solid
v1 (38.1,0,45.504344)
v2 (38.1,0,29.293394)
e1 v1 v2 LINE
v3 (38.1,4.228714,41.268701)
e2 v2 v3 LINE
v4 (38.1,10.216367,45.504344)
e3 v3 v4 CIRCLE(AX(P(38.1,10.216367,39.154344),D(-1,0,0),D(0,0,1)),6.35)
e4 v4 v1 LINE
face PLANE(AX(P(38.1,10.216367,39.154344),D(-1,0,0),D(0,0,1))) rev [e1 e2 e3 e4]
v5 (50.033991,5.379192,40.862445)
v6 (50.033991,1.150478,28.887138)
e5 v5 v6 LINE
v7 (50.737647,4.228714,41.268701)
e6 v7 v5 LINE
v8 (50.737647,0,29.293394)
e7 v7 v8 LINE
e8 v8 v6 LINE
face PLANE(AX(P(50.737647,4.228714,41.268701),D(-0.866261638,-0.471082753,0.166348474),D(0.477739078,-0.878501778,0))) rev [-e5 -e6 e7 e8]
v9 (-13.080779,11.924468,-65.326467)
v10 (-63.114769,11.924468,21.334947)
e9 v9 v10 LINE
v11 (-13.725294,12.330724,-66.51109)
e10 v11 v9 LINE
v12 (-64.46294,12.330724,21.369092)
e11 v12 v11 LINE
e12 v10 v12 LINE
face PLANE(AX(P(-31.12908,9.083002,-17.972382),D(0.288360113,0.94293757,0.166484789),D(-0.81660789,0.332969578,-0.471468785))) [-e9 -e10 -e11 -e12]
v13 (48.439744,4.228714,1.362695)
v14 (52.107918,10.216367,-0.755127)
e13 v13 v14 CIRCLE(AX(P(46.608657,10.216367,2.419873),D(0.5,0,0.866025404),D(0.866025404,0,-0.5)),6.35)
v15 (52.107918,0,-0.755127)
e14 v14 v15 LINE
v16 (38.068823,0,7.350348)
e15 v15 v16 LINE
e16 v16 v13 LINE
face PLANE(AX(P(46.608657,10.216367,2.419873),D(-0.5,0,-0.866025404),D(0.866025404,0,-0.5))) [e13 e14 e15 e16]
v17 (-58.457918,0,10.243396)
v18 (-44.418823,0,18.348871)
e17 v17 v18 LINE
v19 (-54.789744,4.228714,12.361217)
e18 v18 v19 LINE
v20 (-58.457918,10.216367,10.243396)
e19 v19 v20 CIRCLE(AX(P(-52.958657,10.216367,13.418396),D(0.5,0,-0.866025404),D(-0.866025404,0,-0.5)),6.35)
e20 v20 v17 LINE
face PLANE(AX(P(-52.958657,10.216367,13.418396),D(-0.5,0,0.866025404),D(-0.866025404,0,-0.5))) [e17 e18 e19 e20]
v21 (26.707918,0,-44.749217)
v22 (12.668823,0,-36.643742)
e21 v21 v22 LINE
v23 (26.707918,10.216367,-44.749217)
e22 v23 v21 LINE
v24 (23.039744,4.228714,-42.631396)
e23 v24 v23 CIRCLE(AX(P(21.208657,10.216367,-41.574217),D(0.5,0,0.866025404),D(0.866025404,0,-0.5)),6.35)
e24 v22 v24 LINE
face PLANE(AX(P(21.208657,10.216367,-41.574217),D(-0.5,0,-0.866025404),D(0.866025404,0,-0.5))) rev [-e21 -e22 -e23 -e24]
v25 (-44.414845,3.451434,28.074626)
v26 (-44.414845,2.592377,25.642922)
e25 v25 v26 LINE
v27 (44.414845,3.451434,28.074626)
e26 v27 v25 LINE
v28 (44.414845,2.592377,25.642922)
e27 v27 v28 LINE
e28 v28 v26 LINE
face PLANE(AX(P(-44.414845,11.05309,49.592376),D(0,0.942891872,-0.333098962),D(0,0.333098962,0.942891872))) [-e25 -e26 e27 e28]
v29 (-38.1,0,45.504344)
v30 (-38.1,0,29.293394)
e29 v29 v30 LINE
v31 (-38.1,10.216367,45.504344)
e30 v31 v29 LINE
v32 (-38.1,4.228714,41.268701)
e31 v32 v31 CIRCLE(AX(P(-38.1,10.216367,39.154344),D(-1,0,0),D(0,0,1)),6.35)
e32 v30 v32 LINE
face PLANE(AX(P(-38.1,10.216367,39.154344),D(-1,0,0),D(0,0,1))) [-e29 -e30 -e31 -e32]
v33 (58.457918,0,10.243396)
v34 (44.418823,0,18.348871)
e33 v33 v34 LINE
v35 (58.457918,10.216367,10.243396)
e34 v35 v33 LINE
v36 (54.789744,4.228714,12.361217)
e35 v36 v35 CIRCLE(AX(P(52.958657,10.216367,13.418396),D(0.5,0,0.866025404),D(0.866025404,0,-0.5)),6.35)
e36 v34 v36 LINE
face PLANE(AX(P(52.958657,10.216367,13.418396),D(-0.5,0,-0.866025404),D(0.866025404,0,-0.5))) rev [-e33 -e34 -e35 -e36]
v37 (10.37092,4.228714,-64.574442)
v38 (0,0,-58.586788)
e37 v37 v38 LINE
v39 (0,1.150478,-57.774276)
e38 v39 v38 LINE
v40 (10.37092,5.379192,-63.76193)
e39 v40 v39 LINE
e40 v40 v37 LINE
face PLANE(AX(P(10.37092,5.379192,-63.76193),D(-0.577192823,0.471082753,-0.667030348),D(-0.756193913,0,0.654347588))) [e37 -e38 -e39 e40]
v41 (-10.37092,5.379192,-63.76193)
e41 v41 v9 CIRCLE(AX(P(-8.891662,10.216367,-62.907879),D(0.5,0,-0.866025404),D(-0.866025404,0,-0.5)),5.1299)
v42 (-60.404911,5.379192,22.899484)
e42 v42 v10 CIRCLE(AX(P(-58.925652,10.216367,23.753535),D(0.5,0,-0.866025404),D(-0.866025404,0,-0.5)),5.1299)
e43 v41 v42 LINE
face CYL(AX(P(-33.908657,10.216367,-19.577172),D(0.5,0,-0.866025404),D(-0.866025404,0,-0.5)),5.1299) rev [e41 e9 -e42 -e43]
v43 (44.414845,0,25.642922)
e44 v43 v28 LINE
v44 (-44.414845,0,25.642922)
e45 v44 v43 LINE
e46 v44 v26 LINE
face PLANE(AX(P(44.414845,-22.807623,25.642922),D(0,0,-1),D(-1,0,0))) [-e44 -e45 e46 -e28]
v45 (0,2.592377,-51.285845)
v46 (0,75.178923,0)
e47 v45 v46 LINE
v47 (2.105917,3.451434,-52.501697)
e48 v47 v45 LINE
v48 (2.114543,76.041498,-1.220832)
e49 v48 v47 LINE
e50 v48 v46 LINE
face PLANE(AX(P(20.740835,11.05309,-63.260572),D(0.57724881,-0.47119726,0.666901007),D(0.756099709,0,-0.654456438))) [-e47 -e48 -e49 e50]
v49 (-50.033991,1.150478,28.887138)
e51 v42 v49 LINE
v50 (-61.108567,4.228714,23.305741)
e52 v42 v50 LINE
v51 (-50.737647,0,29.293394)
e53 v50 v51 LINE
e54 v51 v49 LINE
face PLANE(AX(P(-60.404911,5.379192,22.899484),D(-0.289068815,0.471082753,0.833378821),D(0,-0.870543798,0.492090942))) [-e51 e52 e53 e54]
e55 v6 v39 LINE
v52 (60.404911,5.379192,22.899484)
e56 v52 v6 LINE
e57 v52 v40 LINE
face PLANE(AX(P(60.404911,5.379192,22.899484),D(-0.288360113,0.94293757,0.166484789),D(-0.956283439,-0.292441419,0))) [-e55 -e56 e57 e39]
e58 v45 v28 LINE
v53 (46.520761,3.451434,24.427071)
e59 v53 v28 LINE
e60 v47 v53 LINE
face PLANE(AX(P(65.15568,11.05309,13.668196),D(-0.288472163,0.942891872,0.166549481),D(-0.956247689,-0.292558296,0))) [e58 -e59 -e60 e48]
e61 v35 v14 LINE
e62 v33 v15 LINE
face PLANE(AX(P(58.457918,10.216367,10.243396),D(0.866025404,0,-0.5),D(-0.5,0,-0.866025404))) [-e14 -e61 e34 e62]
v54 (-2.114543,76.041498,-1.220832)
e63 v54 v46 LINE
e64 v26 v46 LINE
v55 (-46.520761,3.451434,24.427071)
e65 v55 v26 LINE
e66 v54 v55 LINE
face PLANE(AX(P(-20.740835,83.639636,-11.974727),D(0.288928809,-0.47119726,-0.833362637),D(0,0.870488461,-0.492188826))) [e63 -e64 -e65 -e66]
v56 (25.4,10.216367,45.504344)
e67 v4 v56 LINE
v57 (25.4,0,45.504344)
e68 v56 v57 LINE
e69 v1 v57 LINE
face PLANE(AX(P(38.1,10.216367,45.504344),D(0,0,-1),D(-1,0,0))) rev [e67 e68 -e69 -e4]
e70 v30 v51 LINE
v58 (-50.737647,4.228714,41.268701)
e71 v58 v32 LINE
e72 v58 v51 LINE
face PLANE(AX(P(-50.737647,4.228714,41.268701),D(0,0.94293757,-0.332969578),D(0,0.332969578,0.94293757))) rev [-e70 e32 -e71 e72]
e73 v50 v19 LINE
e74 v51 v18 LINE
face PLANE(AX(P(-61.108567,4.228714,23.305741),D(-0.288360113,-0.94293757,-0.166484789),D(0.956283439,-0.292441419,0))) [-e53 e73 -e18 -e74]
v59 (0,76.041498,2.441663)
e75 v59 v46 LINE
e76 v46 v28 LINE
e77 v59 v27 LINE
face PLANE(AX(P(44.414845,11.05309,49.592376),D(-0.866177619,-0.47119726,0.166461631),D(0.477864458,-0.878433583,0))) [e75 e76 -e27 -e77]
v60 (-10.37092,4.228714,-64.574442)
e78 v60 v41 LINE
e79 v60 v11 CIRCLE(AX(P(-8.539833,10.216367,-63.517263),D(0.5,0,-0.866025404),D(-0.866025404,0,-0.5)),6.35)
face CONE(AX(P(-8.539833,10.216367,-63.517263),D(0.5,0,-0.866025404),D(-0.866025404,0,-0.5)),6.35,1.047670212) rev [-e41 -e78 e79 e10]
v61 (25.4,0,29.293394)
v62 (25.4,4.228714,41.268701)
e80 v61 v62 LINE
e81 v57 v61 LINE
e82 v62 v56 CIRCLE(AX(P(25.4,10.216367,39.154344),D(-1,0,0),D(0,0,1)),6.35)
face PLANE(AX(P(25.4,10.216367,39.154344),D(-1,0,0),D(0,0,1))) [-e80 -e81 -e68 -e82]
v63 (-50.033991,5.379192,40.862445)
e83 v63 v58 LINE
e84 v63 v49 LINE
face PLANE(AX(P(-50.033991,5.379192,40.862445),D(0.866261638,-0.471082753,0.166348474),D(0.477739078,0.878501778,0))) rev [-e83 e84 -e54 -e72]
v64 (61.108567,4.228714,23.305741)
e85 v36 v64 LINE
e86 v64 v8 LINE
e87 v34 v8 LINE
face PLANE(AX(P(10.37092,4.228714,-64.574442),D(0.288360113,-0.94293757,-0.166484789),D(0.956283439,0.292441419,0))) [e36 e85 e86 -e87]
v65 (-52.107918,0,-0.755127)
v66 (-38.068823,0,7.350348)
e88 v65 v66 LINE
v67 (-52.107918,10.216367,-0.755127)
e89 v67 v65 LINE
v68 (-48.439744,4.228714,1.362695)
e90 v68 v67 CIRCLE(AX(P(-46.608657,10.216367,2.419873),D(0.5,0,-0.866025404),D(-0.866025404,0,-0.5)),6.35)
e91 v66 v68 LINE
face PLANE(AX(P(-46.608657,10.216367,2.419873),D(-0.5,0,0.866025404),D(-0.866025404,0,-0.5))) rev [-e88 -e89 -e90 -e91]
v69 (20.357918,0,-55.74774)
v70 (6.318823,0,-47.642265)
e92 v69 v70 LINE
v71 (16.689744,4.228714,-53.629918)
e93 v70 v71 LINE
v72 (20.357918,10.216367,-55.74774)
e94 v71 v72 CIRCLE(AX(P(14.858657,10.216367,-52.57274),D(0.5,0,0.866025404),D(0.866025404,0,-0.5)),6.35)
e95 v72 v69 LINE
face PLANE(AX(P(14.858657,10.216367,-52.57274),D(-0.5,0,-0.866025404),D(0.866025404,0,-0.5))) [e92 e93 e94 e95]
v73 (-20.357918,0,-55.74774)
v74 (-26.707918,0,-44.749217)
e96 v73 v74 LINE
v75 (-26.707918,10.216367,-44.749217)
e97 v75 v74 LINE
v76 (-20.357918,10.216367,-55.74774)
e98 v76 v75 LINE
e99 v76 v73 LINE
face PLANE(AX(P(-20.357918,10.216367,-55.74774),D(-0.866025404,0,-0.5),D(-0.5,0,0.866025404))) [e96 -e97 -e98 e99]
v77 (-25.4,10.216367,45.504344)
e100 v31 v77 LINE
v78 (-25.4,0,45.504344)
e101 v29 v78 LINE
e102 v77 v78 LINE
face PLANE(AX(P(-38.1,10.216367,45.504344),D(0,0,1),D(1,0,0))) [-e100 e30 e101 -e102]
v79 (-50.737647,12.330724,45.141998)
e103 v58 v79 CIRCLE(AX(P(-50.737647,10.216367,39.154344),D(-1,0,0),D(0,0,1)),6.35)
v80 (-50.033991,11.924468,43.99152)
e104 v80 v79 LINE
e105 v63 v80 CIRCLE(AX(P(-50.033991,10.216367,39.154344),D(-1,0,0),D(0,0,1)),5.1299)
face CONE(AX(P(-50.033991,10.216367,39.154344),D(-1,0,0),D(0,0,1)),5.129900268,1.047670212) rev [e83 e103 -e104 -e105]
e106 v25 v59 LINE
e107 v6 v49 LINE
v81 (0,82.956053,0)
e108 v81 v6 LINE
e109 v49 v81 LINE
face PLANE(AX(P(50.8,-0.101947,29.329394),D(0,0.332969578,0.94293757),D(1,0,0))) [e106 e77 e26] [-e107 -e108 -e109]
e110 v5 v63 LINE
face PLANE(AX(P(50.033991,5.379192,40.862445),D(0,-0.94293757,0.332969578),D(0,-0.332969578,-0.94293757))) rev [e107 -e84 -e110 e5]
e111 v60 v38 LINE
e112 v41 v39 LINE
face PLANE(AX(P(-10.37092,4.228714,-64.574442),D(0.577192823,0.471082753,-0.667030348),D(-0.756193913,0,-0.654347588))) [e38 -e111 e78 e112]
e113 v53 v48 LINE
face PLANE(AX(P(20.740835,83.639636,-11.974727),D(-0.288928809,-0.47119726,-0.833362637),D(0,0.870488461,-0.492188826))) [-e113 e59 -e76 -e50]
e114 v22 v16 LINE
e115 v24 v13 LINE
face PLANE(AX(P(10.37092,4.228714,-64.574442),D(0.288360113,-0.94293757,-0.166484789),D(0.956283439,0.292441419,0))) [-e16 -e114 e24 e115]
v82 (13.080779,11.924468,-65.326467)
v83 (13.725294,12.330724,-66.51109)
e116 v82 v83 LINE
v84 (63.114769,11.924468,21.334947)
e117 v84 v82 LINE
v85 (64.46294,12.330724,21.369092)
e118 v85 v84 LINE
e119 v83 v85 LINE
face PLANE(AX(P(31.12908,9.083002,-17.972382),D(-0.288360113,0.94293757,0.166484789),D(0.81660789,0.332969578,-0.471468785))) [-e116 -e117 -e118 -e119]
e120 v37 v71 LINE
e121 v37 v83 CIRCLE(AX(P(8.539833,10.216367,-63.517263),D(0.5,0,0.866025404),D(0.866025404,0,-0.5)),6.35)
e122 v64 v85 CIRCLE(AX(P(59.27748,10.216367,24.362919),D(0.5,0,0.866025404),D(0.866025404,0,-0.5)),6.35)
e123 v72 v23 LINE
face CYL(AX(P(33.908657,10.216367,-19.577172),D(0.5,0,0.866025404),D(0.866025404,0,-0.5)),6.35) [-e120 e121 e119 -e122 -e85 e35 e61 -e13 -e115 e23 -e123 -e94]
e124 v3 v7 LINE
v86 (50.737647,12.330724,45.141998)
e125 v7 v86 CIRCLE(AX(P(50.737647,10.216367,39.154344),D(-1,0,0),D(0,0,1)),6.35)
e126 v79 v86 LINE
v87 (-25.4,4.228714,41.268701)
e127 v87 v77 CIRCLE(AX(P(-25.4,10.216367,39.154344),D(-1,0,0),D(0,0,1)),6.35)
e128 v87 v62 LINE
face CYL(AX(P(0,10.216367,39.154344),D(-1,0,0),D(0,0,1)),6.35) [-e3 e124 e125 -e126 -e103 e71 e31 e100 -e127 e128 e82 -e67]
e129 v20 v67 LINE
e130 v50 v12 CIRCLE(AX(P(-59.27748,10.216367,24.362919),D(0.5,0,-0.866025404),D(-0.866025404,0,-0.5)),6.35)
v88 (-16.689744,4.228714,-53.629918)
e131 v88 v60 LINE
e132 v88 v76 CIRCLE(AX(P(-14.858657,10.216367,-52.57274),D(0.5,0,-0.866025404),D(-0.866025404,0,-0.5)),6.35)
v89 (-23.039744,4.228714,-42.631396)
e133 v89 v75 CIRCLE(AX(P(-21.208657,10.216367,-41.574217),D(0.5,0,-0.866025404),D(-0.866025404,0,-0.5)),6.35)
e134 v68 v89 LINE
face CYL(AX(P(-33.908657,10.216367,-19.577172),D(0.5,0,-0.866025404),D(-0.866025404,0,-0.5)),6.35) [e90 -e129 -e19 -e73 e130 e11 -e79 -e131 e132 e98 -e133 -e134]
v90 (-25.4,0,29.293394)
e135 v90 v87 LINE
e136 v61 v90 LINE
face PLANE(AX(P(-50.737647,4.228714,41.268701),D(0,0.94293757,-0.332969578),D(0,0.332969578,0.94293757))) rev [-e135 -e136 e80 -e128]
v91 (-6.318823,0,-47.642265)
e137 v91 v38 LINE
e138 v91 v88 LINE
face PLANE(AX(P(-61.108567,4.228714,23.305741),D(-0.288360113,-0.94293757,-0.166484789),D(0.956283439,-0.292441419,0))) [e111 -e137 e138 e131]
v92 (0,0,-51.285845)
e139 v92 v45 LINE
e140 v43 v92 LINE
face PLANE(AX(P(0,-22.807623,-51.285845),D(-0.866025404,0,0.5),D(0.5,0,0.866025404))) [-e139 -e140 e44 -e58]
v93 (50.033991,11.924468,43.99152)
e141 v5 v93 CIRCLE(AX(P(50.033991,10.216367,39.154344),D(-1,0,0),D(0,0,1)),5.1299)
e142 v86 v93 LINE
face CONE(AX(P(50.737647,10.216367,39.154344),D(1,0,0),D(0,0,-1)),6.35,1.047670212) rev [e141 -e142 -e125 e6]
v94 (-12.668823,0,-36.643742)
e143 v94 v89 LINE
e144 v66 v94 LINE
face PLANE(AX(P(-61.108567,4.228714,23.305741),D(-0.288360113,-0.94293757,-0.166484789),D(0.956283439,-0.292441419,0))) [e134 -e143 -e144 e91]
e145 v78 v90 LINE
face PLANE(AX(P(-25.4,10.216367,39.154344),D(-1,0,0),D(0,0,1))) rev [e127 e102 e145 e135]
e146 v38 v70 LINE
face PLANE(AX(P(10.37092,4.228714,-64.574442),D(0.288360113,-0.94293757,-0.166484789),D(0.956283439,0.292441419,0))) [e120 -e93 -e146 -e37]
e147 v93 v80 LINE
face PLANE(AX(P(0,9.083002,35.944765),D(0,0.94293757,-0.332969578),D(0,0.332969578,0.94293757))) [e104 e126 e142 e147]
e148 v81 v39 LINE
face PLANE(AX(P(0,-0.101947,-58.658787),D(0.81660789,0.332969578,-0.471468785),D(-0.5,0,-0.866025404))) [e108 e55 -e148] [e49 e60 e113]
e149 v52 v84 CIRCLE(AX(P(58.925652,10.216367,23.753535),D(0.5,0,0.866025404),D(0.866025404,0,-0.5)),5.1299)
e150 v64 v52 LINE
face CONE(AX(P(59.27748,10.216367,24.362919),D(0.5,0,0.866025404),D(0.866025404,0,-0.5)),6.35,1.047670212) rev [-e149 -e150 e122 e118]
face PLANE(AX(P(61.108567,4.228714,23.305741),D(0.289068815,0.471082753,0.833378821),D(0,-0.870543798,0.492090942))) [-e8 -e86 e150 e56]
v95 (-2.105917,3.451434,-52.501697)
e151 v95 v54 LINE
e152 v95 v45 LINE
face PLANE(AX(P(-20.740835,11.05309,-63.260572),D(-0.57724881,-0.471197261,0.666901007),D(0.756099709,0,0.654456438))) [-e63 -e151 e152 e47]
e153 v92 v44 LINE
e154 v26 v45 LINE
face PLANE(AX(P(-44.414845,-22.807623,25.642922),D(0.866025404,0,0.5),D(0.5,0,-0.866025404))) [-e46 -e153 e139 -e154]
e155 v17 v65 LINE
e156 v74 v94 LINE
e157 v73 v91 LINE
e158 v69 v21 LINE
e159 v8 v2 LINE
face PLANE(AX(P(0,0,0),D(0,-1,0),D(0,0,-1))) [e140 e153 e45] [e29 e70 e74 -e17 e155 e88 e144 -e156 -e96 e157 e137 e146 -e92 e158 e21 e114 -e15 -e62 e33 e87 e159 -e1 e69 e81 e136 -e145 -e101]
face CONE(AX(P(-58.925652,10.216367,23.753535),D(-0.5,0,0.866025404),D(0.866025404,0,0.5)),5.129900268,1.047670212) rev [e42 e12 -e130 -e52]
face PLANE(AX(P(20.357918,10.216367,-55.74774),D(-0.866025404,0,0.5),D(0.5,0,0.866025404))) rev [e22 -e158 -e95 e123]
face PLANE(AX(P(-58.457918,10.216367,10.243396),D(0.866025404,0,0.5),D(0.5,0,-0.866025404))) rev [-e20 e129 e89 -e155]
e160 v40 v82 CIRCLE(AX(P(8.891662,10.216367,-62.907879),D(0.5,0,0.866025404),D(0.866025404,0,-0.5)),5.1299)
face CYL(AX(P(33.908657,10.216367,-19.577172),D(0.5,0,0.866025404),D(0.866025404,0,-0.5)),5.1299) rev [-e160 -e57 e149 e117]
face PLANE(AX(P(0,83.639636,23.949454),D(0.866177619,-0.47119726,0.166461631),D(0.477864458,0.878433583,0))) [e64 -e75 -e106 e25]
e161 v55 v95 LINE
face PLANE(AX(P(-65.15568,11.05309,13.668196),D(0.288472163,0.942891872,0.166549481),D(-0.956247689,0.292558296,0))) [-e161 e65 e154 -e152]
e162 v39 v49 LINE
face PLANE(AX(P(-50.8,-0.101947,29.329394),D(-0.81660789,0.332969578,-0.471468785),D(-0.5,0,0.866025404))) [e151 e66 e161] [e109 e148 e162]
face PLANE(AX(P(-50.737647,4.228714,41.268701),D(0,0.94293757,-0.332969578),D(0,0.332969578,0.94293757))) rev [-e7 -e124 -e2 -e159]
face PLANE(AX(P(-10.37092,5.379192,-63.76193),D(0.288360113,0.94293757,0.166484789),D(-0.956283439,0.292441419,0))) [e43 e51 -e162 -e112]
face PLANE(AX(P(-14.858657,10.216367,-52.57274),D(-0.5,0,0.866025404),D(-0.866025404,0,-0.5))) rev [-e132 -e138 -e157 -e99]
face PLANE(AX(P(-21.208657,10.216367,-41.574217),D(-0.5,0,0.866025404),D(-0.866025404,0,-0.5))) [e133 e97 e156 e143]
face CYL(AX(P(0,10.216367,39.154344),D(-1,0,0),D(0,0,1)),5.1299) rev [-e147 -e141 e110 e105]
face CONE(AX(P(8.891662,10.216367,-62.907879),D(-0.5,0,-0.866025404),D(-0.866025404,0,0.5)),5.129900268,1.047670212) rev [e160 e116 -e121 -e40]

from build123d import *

# Parameters (mm, degrees)
BOSS_EXTRUDE1_DEPTH  = 82.956052622
CHAMFER1_SIZE        = 83.058
CHAMFER1_SIZE_2      = 29.329393675
BOSS_EXTRUDE3_START  = 2.592376644
BOSS_EXTRUDE3_DEPTH  = 72.586546044
CHAMFER6_SIZE        = 72.644
CHAMFER6_SIZE_2      = 25.663219438
BOSS_EXTRUDE19_DEPTH = 25.4
BOSS_EXTRUDE20_DEPTH = 25.4
BOSS_EXTRUDE21_DEPTH = 25.4
BOSS_EXTRUDE23_DEPTH = 25.4
BOSS_EXTRUDE26_START = 38.1
BOSS_EXTRUDE26_DEPTH = 12.7
BOSS_EXTRUDE27_START = -25.4
BOSS_EXTRUDE27_DEPTH = 12.7
MIRROR2_START        = 38.1
MIRROR2_COPY_2_DEPTH = 12.7
MIRROR2_START_2      = -25.4
MIRROR2_COPY_3_DEPTH = 12.7
MIRROR2_COPY_5_DEPTH = 12.7
MIRROR2_COPY_6_DEPTH = 12.7


with BuildPart() as part:
    # Sketch1 → Boss-Extrude1 (new body)
    with BuildSketch(Plane(origin=(0, 0, 0), x_dir=(1, 0, 0), z_dir=(0, 1, 0))):
        Polygon((-50.8, -29.329393675), (0, 58.65878735), (50.8, -29.329393675), align=None)
    extrude(amount=BOSS_EXTRUDE1_DEPTH)

    # Chamfer1
    # the kernel refuses this chamfer: 83.058, 29.329393675 mm, written as the material it takes off along each edge
    with BuildSketch(Plane(origin=(-158.547298904, 82.956052622, 215.953189756), x_dir=(-0.011114252752895883, -0.9999176455327007, -0.006416816818725978), z_dir=(0.5000000000000001, 0, -0.8660254037844387)), Plane(origin=(266.294597809, 82.956052622, 29.329393675), x_dir=(0, -0.9999176455327007, 0.012833633637452178), z_dir=(-1, 0, 0)), Plane(origin=(-107.747298904, 82.956052622, -245.28258343), x_dir=(0.011114252752896008, -0.9999176455327007, -0.006416816818726048), z_dir=(0.49999999999999994, 0, 0.8660254037844387))) as chamfer1_piece_1:
        Polygon((CHAMFER1_SIZE * 0.999917645533, -CHAMFER1_SIZE * 0.0128336336375), (-CHAMFER1_SIZE_2 * 0.0128336336374, -CHAMFER1_SIZE_2 * 0.999917645527), (0, 0), align=None)
    extrude(amount=532.589195618, mode=Mode.SUBTRACT)


with BuildPart() as body_2:
    # Sketch2 → Boss-Extrude3 (new body)
    with BuildSketch(Plane(origin=(0, 0, 0), x_dir=(1, 0, 0), z_dir=(0, 1, 0)).offset(BOSS_EXTRUDE3_START)):
        Polygon((-44.45, -25.663219465), (0, 51.326438931), (44.45, -25.663219465), align=None)
    extrude(amount=BOSS_EXTRUDE3_DEPTH)

    # Chamfer6
    # the kernel refuses this chamfer: 72.644, 25.663219438 mm, written as the material it takes off along each edge
    with BuildSketch(Plane(origin=(-94.237538797, 75.178922689, -214.550644108), x_dir=(0.011118590367512081, -0.9999175812357334, -0.0064193211416922824), z_dir=(0.5000000000000001, 0, 0.8660254037844386)), Plane(origin=(-138.687538797, 75.178922689, 188.887424643), x_dir=(-0.011118590367511921, -0.9999175812357334, -0.006419321141692186), z_dir=(0.49999999999999994, 0, -0.8660254037844387)), Plane(origin=(232.925077595, 75.178922689, 25.663219465), x_dir=(0, -0.9999175812357332, 0.012838642283384548), z_dir=(-1, 0, 0))) as chamfer6_piece_1:
        Polygon((CHAMFER6_SIZE * 0.999917581236, -CHAMFER6_SIZE * 0.0128386422834), (-CHAMFER6_SIZE_2 * 0.0128386422834, -CHAMFER6_SIZE_2 * 0.999917581236), (0, 0), align=None)
    extrude(amount=465.850155189, mode=Mode.SUBTRACT)

    # Sketch19 → Boss-Extrude19 (add)
    with BuildSketch(Plane(origin=(0, 8.341471254, 23.611918188), x_dir=(1, 0, 0), z_dir=(0, 0.3330989621400992, 0.9428918715426434))):
        Polygon((0, 70.885595133), (-44.414844608, -6.097300002), (44.414844608, -6.097300002), align=None)
    extrude(amount=BOSS_EXTRUDE19_DEPTH)

    # Sketch20 → Boss-Extrude20 (add)
    with BuildSketch(Plane(origin=(-20.448520983, 8.341471254, -11.805959094), x_dir=(-0.43652342739361594, 0.1780689969978707, 0.8818949651997697), z_dir=(-0.8165683137777828, 0.3330989621400992, -0.47144593577132166))):
        Polygon((13.387035379, 69.610019986), (42.464106341, -14.375505607), (-44.767106565, 2.400345516), align=None)
    extrude(amount=BOSS_EXTRUDE20_DEPTH)

    # Sketch21 → Boss-Extrude21 (add)
    with BuildSketch(Plane(origin=(20.448520983, 8.341471254, -11.805959094), x_dir=(-0.43652342739361605, -0.1780689969978708, -0.8818949651997696), z_dir=(0.8165683137777828, 0.3330989621400991, -0.47144593577132177))):
        Polygon((-13.387035361, 69.610020002), (-42.464106341, -14.375505607), (44.767106565, 2.400345516), align=None)
    extrude(amount=BOSS_EXTRUDE21_DEPTH)

    # Sketch22 → Boss-Extrude23 (add)
    with BuildSketch(Plane.XZ.offset(-2.592376644)):
        Polygon((44.414844608, 25.64292249), (-44.414844608, 25.64292249), (0, -51.285844981), align=None)
    extrude(amount=BOSS_EXTRUDE23_DEPTH)


with BuildPart() as part_1:
    add(part.part)

    # Combine3: cut body 2
    add(body_2.part, mode=Mode.SUBTRACT)

    # Sweep2: sweep along a path in Sketch25
    with BuildLine(Plane(origin=(0, 0, 0), x_dir=(0, 0, -1), z_dir=(1, 0, 0))) as sweep2_path:
        Line((-29.293394075, 0), (-41.26870121, 4.228713638))
        ThreePointArc((-41.26870121, 4.228713638), (-44.883330876, 7.477532809), (-45.141997958, 12.330724024))
    # Sketch24 → Sweep2 (sweep)
    with BuildSketch(Plane(origin=(0, 9.197233007, 26.045672391), x_dir=(1, 0, 0), z_dir=(0, 0.33296957778049097, 0.9429375696580775))):
        Polygon((-50.737646864, -9.753809057), (50.737646864, -9.753809057), (50.03399067, -8.533709325), (-50.03399067, -8.533709325), align=None)
    sweep2 = sweep(path=sweep2_path.line)

    # Sketch26 → Boss-Extrude26 (add)
    with BuildSketch(Plane(origin=(0, 0, 0), x_dir=(0, 0, -1), z_dir=(1, 0, 0)).offset(BOSS_EXTRUDE26_START)):
        with BuildLine():
            Line((-45.504344391, 10.216367205), (-45.504344391, 0))
            Line((-45.504344391, 0), (-29.293394075, 0))
            Line((-29.293394075, 0), (-41.26870121, 4.228713638))
            ThreePointArc((-41.26870121, 4.228713638), (-44.338390388, 6.549192939), (-45.504344391, 10.216367205))
        make_face()
    boss_extrude26 = extrude(amount=-BOSS_EXTRUDE26_DEPTH)

    # Sketch26<7> → Boss-Extrude27 (add)
    with BuildSketch(Plane(origin=(0, 0, 0), x_dir=(0, 0, -1), z_dir=(1, 0, 0)).offset(BOSS_EXTRUDE27_START)):
        with BuildLine():
            Line((-45.504344391, 10.216367205), (-45.504344391, 0))
            Line((-45.504344391, 0), (-29.293394075, 0))
            Line((-29.293394075, 0), (-41.26870121, 4.228713638))
            ThreePointArc((-41.26870121, 4.228713638), (-44.338390388, 6.549192939), (-45.504344391, 10.216367205))
        make_face()
    boss_extrude27 = extrude(amount=-BOSS_EXTRUDE27_DEPTH)

    # Mirror1: Sweep2, Boss-Extrude26, Boss-Extrude27 across plane
    add(sweep2.mirror(Plane(origin=(0, 0, 0), x_dir=(0.8660254037844387, 0, 0.49999999999999994), z_dir=(-0.49999999999999983, 0, 0.8660254037844387))))
    add(boss_extrude26.mirror(Plane(origin=(0, 0, 0), x_dir=(0.8660254037844387, 0, 0.49999999999999994), z_dir=(-0.49999999999999983, 0, 0.8660254037844387))))
    add(boss_extrude27.mirror(Plane(origin=(0, 0, 0), x_dir=(0.8660254037844387, 0, 0.49999999999999994), z_dir=(-0.49999999999999983, 0, 0.8660254037844387))))

    # Mirror2 copy 1: sweep along a path in Mirror2 copy 1 path
    with BuildLine(Plane(origin=(0, 0, 0), x_dir=(-0.8660254037844385, 0, 0.5), z_dir=(-0.5000000000000001, 0, -0.8660254037844388))) as mirror2_copy_1_path:
        Line((-29.293394075, 0), (-41.26870121, 4.228713638))
        ThreePointArc((-41.26870121, 4.228713638), (-44.883330876, 7.477532809), (-45.141997958, 12.330724024))
    # Mirror2 copy 1 sketch → Mirror2 copy 1 (sweep)
    with BuildSketch(Plane(origin=(22.55621395, 9.197233007, -13.022836196), x_dir=(-0.5000000000000001, 0, -0.8660254037844388), z_dir=(0.8166078895066538, 0.33296957778049074, -0.4714687848290388))):
        Polygon((-50.737646864, -9.753809057), (50.737646864, -9.753809057), (50.03399067, -8.533709325), (-50.03399067, -8.533709325), align=None)
    sweep(path=mirror2_copy_1_path.line)

    # Mirror2 copy 2 sketch → Mirror2 copy 2 (add)
    with BuildSketch(Plane(origin=(0, 0, 0), x_dir=(-0.8660254037844385, 0, 0.5), z_dir=(-0.5000000000000001, 0, -0.8660254037844388)).offset(MIRROR2_START)):
        with BuildLine():
            Line((-45.504344391, 10.216367205), (-45.504344391, 0))
            Line((-45.504344391, 0), (-29.293394075, 0))
            Line((-29.293394075, 0), (-41.26870121, 4.228713638))
            ThreePointArc((-41.26870121, 4.228713638), (-44.338390388, 6.549192939), (-45.504344391, 10.216367205))
        make_face()
    extrude(amount=-MIRROR2_COPY_2_DEPTH)

    # Mirror2 copy 3 sketch → Mirror2 copy 3 (add)
    with BuildSketch(Plane(origin=(0, 0, 0), x_dir=(-0.8660254037844385, 0, 0.5), z_dir=(-0.5000000000000001, 0, -0.8660254037844388)).offset(MIRROR2_START_2)):
        with BuildLine():
            Line((-45.504344391, 10.216367205), (-45.504344391, 0))
            Line((-45.504344391, 0), (-29.293394075, 0))
            Line((-29.293394075, 0), (-41.26870121, 4.228713638))
            ThreePointArc((-41.26870121, 4.228713638), (-44.338390388, 6.549192939), (-45.504344391, 10.216367205))
        make_face()
    extrude(amount=-MIRROR2_COPY_3_DEPTH)

    # Mirror2 copy 4: sweep along a path in Mirror2 copy 4 path
    with BuildLine(Plane(origin=(0, 0, 0), x_dir=(0.8660254037844389, 0, 0.4999999999999998), z_dir=(0.49999999999999956, 0, -0.8660254037844389))) as mirror2_copy_4_path:
        Line((-29.293394075, 0), (-41.26870121, -4.228713638))
        ThreePointArc((-41.26870121, -4.228713638), (-44.883330876, -7.477532809), (-45.141997958, -12.330724024))
    # Mirror2 copy 4 sketch → Mirror2 copy 4 (sweep)
    with BuildSketch(Plane(origin=(-22.55621395, 9.197233007, -13.022836196), x_dir=(0.49999999999999956, 0, -0.8660254037844389), z_dir=(-0.8166078895066541, 0.33296957778049086, -0.4714687848290386))):
        Polygon((-50.737646864, 9.753809057), (50.737646864, 9.753809057), (50.03399067, 8.533709325), (-50.03399067, 8.533709325), align=None)
    sweep(path=mirror2_copy_4_path.line)

    # Mirror2 copy 5 sketch → Mirror2 copy 5 (add)
    with BuildSketch(Plane(origin=(0, 0, 0), x_dir=(0.8660254037844389, 0, 0.4999999999999998), z_dir=(0.49999999999999956, 0, -0.8660254037844389)).offset(MIRROR2_START)):
        with BuildLine():
            Line((-45.504344391, -10.216367205), (-45.504344391, 0))
            Line((-45.504344391, 0), (-29.293394075, 0))
            Line((-29.293394075, 0), (-41.26870121, -4.228713638))
            ThreePointArc((-41.26870121, -4.228713638), (-44.338390388, -6.549192939), (-45.504344391, -10.216367205))
        make_face()
    extrude(amount=-MIRROR2_COPY_5_DEPTH)

    # Mirror2 copy 6 sketch → Mirror2 copy 6 (add)
    with BuildSketch(Plane(origin=(0, 0, 0), x_dir=(0.8660254037844389, 0, 0.4999999999999998), z_dir=(0.49999999999999956, 0, -0.8660254037844389)).offset(MIRROR2_START_2)):
        with BuildLine():
            Line((-45.504344391, -10.216367205), (-45.504344391, 0))
            Line((-45.504344391, 0), (-29.293394075, 0))
            Line((-29.293394075, 0), (-41.26870121, -4.228713638))
            ThreePointArc((-41.26870121, -4.228713638), (-44.338390388, -6.549192939), (-45.504344391, -10.216367205))
        make_face()
    extrude(amount=-MIRROR2_COPY_6_DEPTH)


solid = part_1.part
